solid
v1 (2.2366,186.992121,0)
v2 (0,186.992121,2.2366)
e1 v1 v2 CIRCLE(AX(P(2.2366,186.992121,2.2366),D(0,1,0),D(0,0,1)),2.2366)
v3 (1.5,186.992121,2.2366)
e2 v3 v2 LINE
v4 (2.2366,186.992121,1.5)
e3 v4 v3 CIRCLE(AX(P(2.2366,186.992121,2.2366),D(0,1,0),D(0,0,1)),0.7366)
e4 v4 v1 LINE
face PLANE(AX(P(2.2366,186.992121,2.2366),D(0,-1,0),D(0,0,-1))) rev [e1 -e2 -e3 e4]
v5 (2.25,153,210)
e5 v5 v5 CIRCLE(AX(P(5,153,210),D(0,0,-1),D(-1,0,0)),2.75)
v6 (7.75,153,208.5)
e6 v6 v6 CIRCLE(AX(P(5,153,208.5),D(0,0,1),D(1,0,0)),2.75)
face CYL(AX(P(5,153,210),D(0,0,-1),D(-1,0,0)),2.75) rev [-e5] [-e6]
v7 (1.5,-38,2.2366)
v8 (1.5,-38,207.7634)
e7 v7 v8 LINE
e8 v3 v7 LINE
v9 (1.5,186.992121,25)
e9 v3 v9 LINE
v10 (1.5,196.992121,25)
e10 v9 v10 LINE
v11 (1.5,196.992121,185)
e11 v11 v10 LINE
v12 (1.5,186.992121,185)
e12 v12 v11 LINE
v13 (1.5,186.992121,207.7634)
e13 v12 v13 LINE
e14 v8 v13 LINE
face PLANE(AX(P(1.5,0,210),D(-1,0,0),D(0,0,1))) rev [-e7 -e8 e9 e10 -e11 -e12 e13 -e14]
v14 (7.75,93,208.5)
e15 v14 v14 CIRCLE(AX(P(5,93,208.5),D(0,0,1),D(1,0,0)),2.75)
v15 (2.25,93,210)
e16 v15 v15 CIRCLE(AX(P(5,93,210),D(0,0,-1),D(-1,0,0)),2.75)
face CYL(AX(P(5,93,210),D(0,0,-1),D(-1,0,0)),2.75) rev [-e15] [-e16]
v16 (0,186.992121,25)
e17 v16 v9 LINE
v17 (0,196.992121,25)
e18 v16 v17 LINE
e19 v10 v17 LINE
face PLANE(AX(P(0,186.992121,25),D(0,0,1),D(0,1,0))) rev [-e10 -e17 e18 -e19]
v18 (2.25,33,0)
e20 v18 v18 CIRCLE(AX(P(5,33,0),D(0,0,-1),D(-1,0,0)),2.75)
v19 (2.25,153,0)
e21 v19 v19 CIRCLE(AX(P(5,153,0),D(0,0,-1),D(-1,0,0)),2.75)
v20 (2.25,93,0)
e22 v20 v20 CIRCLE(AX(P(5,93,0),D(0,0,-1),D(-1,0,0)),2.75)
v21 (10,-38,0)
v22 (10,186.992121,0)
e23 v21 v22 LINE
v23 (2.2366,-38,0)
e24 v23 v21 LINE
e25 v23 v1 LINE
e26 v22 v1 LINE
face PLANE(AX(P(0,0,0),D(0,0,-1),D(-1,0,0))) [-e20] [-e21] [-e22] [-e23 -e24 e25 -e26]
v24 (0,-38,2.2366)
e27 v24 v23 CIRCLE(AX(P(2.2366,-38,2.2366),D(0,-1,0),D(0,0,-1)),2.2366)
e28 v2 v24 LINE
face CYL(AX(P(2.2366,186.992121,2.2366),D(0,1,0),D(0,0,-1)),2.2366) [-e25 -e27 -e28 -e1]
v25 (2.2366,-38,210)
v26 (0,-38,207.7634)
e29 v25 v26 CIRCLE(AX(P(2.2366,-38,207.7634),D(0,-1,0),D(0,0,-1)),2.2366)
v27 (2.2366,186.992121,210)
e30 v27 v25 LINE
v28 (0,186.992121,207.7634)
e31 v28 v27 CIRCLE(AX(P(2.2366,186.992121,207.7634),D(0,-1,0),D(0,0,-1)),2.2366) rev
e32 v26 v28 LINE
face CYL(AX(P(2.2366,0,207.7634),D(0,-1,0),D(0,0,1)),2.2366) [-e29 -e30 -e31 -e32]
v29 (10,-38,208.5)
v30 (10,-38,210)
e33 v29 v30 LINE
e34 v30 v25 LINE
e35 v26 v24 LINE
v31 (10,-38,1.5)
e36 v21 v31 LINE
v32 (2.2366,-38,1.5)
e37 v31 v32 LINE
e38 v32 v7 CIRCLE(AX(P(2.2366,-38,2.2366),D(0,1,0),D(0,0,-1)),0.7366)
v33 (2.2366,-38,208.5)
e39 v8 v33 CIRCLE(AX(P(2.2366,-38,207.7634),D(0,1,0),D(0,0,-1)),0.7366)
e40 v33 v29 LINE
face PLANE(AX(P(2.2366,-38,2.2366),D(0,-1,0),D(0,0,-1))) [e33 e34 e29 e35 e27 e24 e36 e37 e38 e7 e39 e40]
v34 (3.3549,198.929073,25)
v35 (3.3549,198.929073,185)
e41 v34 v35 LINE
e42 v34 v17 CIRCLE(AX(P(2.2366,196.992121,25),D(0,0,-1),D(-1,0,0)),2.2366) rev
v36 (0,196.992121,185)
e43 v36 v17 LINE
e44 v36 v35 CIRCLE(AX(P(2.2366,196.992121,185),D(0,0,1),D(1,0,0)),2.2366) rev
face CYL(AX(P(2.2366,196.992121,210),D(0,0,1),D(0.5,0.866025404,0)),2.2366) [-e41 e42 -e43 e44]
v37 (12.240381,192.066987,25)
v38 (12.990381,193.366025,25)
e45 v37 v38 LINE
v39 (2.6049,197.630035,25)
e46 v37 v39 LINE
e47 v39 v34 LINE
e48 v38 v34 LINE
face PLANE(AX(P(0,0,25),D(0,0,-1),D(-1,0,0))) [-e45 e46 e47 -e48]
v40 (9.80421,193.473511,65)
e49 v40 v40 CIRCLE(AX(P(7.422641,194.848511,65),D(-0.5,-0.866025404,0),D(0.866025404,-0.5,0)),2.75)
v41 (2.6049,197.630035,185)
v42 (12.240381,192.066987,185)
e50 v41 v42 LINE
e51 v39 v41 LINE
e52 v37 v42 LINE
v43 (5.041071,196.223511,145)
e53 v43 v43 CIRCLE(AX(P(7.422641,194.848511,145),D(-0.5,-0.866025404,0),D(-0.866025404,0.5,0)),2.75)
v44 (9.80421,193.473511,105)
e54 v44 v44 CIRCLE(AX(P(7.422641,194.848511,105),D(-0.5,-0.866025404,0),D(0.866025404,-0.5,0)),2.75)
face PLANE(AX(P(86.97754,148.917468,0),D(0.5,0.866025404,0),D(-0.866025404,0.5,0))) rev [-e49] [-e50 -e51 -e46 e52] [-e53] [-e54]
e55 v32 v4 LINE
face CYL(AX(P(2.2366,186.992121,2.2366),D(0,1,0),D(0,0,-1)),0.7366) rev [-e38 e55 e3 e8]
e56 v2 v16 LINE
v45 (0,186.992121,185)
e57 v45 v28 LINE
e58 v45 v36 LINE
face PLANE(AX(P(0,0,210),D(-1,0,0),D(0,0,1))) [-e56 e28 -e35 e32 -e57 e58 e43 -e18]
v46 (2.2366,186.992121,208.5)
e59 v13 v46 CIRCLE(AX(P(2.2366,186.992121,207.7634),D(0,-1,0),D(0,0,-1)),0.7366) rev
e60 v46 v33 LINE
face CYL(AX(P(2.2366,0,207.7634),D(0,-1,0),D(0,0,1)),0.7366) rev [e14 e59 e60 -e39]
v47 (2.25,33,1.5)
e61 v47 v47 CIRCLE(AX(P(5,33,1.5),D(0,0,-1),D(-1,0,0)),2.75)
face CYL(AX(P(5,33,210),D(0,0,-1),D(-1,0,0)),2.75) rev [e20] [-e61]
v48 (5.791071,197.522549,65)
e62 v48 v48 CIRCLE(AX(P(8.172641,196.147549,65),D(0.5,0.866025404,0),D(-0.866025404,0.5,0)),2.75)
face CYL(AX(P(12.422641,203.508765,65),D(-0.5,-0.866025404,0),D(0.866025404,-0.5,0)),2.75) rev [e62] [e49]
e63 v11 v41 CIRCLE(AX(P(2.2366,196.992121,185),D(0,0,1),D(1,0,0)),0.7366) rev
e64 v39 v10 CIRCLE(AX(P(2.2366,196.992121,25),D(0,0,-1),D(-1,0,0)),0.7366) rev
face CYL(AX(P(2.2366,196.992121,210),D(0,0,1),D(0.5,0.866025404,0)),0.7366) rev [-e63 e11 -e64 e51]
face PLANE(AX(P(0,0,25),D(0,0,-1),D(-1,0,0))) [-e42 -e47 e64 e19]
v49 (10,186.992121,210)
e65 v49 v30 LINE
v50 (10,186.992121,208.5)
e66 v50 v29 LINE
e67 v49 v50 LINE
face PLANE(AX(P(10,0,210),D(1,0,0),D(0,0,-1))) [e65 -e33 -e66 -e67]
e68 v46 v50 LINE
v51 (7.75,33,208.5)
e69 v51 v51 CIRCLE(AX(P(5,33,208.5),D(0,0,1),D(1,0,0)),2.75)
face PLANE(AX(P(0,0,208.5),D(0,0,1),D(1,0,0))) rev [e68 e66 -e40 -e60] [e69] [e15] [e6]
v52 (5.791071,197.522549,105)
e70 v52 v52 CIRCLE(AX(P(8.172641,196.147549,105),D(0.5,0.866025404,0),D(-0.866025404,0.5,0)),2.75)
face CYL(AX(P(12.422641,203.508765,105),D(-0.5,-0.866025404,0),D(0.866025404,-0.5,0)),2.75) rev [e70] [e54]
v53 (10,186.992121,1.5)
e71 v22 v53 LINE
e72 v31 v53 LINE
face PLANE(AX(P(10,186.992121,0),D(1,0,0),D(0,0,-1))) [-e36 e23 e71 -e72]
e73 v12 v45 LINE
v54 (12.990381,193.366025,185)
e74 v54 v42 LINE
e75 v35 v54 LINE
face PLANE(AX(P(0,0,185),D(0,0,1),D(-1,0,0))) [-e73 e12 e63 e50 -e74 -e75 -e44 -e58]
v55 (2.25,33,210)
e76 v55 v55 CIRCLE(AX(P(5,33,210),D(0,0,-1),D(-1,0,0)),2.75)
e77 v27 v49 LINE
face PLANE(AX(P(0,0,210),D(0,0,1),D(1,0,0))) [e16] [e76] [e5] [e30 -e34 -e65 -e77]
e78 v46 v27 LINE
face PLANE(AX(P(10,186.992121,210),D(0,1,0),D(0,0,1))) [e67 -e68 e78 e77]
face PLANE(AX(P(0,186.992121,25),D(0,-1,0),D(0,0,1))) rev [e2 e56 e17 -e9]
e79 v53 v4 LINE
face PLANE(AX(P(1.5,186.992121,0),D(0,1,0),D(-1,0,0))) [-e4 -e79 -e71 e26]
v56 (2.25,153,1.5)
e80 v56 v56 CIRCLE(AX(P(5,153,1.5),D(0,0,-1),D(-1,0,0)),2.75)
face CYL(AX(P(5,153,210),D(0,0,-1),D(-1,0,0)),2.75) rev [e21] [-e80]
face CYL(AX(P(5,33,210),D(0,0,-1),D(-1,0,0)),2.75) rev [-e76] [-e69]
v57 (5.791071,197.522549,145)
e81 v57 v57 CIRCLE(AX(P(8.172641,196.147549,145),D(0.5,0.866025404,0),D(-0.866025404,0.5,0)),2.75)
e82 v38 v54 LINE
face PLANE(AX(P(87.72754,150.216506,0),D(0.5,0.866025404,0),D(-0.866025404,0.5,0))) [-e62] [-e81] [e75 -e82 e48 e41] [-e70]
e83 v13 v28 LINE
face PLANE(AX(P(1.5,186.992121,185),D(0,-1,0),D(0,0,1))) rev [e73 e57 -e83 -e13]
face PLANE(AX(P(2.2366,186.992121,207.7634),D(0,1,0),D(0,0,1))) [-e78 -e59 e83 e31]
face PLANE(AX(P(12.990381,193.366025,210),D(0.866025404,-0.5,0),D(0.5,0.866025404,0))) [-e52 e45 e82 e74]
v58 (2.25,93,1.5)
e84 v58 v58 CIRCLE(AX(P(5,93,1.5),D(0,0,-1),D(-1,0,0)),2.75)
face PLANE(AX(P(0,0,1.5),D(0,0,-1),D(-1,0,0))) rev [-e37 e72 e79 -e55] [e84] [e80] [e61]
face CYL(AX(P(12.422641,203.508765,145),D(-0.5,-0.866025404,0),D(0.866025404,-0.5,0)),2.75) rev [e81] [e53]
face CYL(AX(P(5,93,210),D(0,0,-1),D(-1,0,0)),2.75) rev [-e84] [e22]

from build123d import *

# Parameters (mm, degrees)
SKETCH_1_W                       = 1.5
SKETCH_1_H                       = 200
SM_BASE_FLANGE_1_DEPTH           = 210
SM_EDGE_FLANGE_2_DEPTH           = 210
SM_EDGE_FLANGE_2_2_DEPTH         = 210
CUT_EXTRUDE_1_DEPTH              = 25
SKETCH_13_W                      = 1.5
SKETCH_13_H                      = 25
CUT_EXTRUDE_2_DEPTH              = 10
SKETCH_14_R                      = 2.75
CUT_EXTRUDE_3_DEPTH              = 10
SM_EDGE_FLANGE_5_STRIP_W         = 7.4732
SM_EDGE_FLANGE_5_STRIP_H         = 1.5
SM_EDGE_FLANGE_5_STRIP_CUT_DEPTH = 186.992120568
SM_EDGE_FLANGE_5_DEPTH           = 186.992120568
SM_EDGE_FLANGE_6_STRIP_W         = 7.4732
SM_EDGE_FLANGE_6_STRIP_H         = 1.5
SM_EDGE_FLANGE_6_STRIP_CUT_DEPTH = 186.992120568
SM_EDGE_FLANGE_6_DEPTH           = 186.992120568
SKETCH_27_R                      = 2.75
CUT_EXTRUDE_4_DEPTH              = 290.759957722
EXTRUDE_1_DEPTH                  = 38


# Read off the part's stored shape, not the designer's step: 边线-法兰2
# Sheet-metal steps are written as plain solids
with BuildPart() as part:
    # Sketch 1 → 基体-法兰1 (new body)
    with BuildSketch(Plane.XY):
        with Locations((0.75, 100)):
            Rectangle(SKETCH_1_W, SKETCH_1_H)
    extrude(amount=SM_BASE_FLANGE_1_DEPTH)

    # 边线-法兰2 outline → 边线-法兰2 (cut)
    with BuildSketch(Plane.XY):
        with BuildLine():
            ThreePointArc((0, 196.992120568), (0.413161062, 198.28728465), (1.5, 199.103944424))
            Line((1.5, 199.103944424), (1.5, 200))
            Line((1.5, 200), (0, 200))
            Line((0, 200), (0, 196.992120568))
        make_face()
    extrude(amount=SM_EDGE_FLANGE_2_DEPTH, mode=Mode.SUBTRACT)

    # Sm Edge Flange 2 2 outline → Sm Edge Flange 2 2 (add)
    with BuildSketch(Plane.XY):
        with BuildLine():
            Line((12.990381057, 193.366025404), (3.3549, 198.929072986))
            ThreePointArc((3.3549, 198.929072986), (2.446525528, 199.218847051), (1.5, 199.103944424))
            Line((1.5, 199.103944424), (1.5, 196.992120568))
            ThreePointArc((1.5, 196.992120568), (1.8683, 197.63003488), (2.6049, 197.63003488))
            Line((2.6049, 197.63003488), (12.240381057, 192.066987298))
            Line((12.240381057, 192.066987298), (12.990381057, 193.366025404))
        make_face()
    extrude(amount=SM_EDGE_FLANGE_2_2_DEPTH)

    # 草图12 → 切除-拉伸1 (cut)
    with BuildSketch(Plane(origin=(0, 0, 0), x_dir=(-1, 0, 0), z_dir=(0, 0, -1))):
        Polygon((0, 196.992120568), (-3.169381215, 196.992120568), (-3.169381215, 190.456162681), (-17.36722667, 190.456162681), (-17.36722667, 200.115352772), (-3.169381215, 200.115352772), (0, 200.115352772), align=None)
    cut_extrude_1 = extrude(amount=-CUT_EXTRUDE_1_DEPTH, mode=Mode.SUBTRACT)

    # 草图13 → 切除-拉伸2 (cut)
    with BuildSketch(Plane(origin=(0, 196.992120568, 0), x_dir=(1, 0, 0), z_dir=(0, 1, 0))):
        with Locations((0.75, -12.5)):
            Rectangle(SKETCH_13_W, SKETCH_13_H)
    cut_extrude_2 = extrude(amount=-CUT_EXTRUDE_2_DEPTH, mode=Mode.SUBTRACT)

    # 镜向1: 切除-拉伸1, 切除-拉伸2 across plane
    add(cut_extrude_1.mirror(Plane(origin=(0, 0, 105), x_dir=(1, 0, 0), z_dir=(0, 0, -1))), mode=Mode.SUBTRACT)
    add(cut_extrude_2.mirror(Plane(origin=(0, 0, 105), x_dir=(1, 0, 0), z_dir=(0, 0, -1))), mode=Mode.SUBTRACT)

    # 草图14 → 切除-拉伸3 (cut)
    with BuildSketch(Plane(origin=(86.227540378, 149.350480947, 0), x_dir=(0.86602540378444, -0.4999999999999978, 0), z_dir=(-0.4999999999999978, -0.86602540378444, 0))):
        with Locations((-90.996060284, 65)):
            Circle(SKETCH_14_R)
        with Locations((-90.996060284, 105)):
            Circle(SKETCH_14_R)
        with Locations(Location((-90.996060284, 145, 0), (0, 0, 180))):
            Circle(SKETCH_14_R)
    extrude(amount=-CUT_EXTRUDE_3_DEPTH, mode=Mode.SUBTRACT)

    # 边线-法兰5 strip (across the edge) → 边线-法兰5 strip cut (cut)
    with BuildSketch(Plane(origin=(1.5, 0, 0), x_dir=(0, 0, 1), z_dir=(0, 1, 0))):
        with Locations((-1.5, -0.75)):
            Rectangle(SM_EDGE_FLANGE_5_STRIP_W, SM_EDGE_FLANGE_5_STRIP_H)
    extrude(amount=SM_EDGE_FLANGE_5_STRIP_CUT_DEPTH, mode=Mode.SUBTRACT)

    # 边线-法兰5 section (across the edge) → 边线-法兰5 (add)
    with BuildSketch(Plane(origin=(1.5, 0, 0), x_dir=(0, 0, 1), z_dir=(0, 1, 0))):
        with BuildLine():
            Line((0, 0.7366), (0, 8.5))
            Line((0, 8.5), (1.5, 8.5))
            Line((1.5, 8.5), (1.5, 0.7366))
            ThreePointArc((1.5, 0.7366), (1.715745145, 0.215745145), (2.2366, 0))
            Line((2.2366, 0), (2.2366, -1.5))
            ThreePointArc((2.2366, -1.5), (0.655084973, -0.844915027), (0, 0.7366))
        make_face()
    extrude(amount=SM_EDGE_FLANGE_5_DEPTH)

    # 边线-法兰6 strip (across the edge) → 边线-法兰6 strip cut (cut)
    with BuildSketch(Plane(origin=(1.5, 186.992120568, 210), x_dir=(0, 0, -1), z_dir=(0, -1, 0))):
        with Locations((-1.5, -0.75)):
            Rectangle(SM_EDGE_FLANGE_6_STRIP_W, SM_EDGE_FLANGE_6_STRIP_H)
    extrude(amount=SM_EDGE_FLANGE_6_STRIP_CUT_DEPTH, mode=Mode.SUBTRACT)

    # 边线-法兰6 section (across the edge) → 边线-法兰6 (add)
    with BuildSketch(Plane(origin=(1.5, 186.992120568, 210), x_dir=(0, 0, -1), z_dir=(0, -1, 0))):
        with BuildLine():
            Line((0, 0.7366), (0, 8.5))
            Line((0, 8.5), (1.5, 8.5))
            Line((1.5, 8.5), (1.5, 0.7366))
            ThreePointArc((1.5, 0.7366), (1.715745145, 0.215745145), (2.2366, 0))
            Line((2.2366, 0), (2.2366, -1.5))
            ThreePointArc((2.2366, -1.5), (0.655084973, -0.844915027), (0, 0.7366))
        make_face()
    extrude(amount=SM_EDGE_FLANGE_6_DEPTH)

    # 草图27 → 切除-拉伸4 (cut, through all)
    with BuildSketch(Plane(origin=(0, 0, 0), x_dir=(-1, 0, 0), z_dir=(0, 0, -1))):
        with Locations((-5, 153)):
            Circle(SKETCH_27_R)
        with Locations((-5, 93)):
            Circle(SKETCH_27_R)
        with Locations((-5, 33)):
            Circle(SKETCH_27_R)
    extrude(amount=-CUT_EXTRUDE_4_DEPTH, mode=Mode.SUBTRACT)

    # 草图28 → 凸台-拉伸1 (add)
    with BuildSketch(Plane.XZ):
        with BuildLine():
            Line((0, 2.2366), (0, 207.7634))
            ThreePointArc((0, 207.7634), (0.655084973, 209.344915027), (2.2366, 210))
            Line((2.2366, 210), (10, 210))
            Line((10, 210), (10, 208.5))
            Line((10, 208.5), (2.2366, 208.5))
            ThreePointArc((2.2366, 208.5), (1.715745145, 208.284254855), (1.5, 207.7634))
            Line((1.5, 207.7634), (1.5, 2.2366))
            ThreePointArc((1.5, 2.2366), (1.715745145, 1.715745145), (2.2366, 1.5))
            Line((2.2366, 1.5), (10, 1.5))
            Line((10, 1.5), (10, 0))
            Line((10, 0), (2.2366, 0))
            ThreePointArc((2.2366, 0), (0.655084973, 0.655084973), (0, 2.2366))
        make_face()
    extrude(amount=EXTRUDE_1_DEPTH)


solid = part.part
